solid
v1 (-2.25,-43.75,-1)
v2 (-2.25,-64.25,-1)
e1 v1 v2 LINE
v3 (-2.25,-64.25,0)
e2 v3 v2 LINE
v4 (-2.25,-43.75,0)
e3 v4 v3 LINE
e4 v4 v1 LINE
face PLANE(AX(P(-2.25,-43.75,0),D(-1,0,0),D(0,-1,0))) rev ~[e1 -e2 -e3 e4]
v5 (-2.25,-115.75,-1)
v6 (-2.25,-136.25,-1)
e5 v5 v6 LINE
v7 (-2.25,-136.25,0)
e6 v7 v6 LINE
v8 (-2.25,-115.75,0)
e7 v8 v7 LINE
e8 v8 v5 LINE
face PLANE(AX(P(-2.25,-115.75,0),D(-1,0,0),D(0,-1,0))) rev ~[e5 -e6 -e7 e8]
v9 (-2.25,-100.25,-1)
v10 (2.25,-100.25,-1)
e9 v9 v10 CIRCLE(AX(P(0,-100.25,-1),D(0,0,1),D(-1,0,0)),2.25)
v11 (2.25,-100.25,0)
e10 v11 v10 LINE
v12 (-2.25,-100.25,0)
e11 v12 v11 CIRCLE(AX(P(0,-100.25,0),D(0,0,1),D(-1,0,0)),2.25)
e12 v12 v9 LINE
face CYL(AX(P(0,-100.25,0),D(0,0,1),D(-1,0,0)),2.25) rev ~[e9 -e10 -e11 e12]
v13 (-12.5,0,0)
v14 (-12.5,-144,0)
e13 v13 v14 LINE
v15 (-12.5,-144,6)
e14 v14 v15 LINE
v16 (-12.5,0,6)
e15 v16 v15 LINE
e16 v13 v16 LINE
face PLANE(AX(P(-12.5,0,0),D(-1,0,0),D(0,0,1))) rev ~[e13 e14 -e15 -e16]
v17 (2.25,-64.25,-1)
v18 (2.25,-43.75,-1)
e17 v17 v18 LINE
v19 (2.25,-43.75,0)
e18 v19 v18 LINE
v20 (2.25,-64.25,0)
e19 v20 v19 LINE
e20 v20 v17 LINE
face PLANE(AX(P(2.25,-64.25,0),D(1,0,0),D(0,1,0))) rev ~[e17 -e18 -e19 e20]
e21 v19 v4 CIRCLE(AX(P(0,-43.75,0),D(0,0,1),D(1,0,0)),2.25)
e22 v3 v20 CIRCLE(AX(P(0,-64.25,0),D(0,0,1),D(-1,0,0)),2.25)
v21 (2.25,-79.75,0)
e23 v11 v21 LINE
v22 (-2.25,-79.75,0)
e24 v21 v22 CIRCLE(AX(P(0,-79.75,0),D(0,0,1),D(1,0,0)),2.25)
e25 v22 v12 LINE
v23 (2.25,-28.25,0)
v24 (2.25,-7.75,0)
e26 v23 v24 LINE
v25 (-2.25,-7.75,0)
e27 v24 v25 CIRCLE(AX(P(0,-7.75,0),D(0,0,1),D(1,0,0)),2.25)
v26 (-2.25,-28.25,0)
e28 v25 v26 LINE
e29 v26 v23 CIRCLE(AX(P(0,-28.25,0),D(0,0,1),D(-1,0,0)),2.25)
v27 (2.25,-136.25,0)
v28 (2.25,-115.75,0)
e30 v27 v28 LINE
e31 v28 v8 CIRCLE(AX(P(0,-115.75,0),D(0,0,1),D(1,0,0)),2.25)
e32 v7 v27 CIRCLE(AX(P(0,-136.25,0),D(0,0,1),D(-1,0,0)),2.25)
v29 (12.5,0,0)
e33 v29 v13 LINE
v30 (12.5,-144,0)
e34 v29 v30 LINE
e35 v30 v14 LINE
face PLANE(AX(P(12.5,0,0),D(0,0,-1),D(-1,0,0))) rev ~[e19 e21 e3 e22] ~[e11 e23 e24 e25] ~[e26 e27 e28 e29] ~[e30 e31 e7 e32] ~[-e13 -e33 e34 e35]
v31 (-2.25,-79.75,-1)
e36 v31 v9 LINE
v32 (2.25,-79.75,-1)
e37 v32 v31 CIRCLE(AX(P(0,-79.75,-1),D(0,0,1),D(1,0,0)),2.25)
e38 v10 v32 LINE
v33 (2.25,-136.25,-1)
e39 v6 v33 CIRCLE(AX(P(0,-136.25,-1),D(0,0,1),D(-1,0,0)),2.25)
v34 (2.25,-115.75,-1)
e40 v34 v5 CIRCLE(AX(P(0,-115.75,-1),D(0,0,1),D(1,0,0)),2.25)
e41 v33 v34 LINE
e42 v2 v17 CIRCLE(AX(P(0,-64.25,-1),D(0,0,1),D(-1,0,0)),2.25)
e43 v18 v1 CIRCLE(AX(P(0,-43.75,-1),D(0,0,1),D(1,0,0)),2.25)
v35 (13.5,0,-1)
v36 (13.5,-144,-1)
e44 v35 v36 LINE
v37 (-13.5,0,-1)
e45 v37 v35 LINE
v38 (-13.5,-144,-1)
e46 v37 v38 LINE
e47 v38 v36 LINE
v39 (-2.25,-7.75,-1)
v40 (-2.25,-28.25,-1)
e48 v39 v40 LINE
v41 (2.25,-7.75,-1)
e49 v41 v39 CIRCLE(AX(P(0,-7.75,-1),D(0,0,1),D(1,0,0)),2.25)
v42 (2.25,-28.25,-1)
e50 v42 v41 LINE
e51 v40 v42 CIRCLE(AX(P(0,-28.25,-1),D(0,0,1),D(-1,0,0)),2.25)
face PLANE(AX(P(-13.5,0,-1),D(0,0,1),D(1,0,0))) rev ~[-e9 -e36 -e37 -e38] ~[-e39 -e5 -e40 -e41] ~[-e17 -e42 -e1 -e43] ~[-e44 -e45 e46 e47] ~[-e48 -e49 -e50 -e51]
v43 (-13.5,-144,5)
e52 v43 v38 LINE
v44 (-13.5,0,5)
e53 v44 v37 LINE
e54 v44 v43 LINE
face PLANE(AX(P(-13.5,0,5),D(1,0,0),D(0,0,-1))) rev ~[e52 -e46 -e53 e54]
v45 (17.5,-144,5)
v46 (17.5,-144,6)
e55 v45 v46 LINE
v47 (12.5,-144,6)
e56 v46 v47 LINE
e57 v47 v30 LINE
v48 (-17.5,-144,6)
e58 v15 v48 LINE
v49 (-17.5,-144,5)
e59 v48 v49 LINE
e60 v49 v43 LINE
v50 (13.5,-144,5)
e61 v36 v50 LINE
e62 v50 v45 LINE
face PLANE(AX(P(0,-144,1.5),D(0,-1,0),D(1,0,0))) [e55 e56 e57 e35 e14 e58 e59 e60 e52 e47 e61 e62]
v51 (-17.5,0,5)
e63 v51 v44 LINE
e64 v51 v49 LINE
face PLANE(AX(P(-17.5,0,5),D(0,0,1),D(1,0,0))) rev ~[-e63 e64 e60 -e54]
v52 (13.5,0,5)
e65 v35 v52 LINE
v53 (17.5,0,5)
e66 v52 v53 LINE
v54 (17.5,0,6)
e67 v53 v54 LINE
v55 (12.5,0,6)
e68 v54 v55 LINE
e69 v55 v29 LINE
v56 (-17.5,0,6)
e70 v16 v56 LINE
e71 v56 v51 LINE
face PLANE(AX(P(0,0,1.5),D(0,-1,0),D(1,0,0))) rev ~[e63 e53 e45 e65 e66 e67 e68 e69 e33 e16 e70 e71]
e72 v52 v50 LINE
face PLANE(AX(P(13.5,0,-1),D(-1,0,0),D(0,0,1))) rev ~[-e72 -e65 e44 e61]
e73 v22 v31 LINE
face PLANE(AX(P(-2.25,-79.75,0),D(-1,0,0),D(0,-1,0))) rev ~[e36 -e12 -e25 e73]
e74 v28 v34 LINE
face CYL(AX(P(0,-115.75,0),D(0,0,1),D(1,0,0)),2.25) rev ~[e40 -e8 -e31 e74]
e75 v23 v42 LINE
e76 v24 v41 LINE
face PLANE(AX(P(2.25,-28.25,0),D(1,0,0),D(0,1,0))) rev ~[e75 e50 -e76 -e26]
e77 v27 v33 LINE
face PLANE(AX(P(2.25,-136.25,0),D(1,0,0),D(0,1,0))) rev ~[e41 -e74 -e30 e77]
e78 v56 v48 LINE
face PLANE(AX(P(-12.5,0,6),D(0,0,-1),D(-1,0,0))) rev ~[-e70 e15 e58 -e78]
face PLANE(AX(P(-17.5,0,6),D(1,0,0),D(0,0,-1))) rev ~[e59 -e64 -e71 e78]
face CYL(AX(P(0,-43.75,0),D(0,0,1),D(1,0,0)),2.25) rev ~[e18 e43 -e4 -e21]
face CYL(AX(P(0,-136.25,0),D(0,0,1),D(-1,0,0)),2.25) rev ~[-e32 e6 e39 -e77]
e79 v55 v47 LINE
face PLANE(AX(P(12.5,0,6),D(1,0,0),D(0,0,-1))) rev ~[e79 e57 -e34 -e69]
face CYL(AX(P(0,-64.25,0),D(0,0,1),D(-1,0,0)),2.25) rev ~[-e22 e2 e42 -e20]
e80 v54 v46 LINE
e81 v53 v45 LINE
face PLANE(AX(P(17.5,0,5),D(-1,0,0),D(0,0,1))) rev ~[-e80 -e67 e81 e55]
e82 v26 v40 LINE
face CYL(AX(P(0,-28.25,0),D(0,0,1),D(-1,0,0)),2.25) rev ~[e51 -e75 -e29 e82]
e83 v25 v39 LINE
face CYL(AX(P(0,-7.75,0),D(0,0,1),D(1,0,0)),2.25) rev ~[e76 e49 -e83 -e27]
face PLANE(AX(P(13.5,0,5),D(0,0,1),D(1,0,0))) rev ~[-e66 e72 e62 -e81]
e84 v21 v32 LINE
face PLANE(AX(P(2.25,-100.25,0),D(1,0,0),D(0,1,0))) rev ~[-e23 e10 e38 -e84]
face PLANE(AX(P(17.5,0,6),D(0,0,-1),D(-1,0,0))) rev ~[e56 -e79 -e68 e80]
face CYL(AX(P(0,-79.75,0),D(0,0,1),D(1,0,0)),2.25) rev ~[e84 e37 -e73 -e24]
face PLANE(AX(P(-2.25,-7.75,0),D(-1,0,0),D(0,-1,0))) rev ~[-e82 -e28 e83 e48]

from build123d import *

# Parameters (mm, degrees)
F1_DEPTH = 144
F3_DEPTH = 1.001


# Not quite as in the source:
# - a feature names something its author has since deleted; it is built from what else it names


with BuildPart() as f1:
    # F0 (on Front) → F1 (new body)
    with BuildSketch(Plane.XZ):
        Polygon((-17.5, 6), (-17.5, 5), (-13.5, 5), (-13.5, -1), (13.5, -1), (13.5, 5), (17.5, 5), (17.5, 6), (12.5, 6), (12.5, 0), (-12.5, 0), (-12.5, 6), align=None)
    extrude(amount=F1_DEPTH)

    # F2 (on face) → F3 (cut, through all)
    with BuildSketch(Plane.XY):
        with BuildLine():
            ThreePointArc((-2.25, -28.25), (0, -30.5), (2.25, -28.25))
            Line((2.25, -28.25), (2.25, -7.75))
            ThreePointArc((2.25, -7.75), (0, -5.5), (-2.25, -7.75))
            Line((-2.25, -7.75), (-2.25, -28.25))
        make_face()
        with BuildLine():
            Line((-2.25, -43.75), (-2.25, -64.25))
            ThreePointArc((-2.25, -64.25), (0, -66.5), (2.25, -64.25))
            Line((2.25, -64.25), (2.25, -43.75))
            ThreePointArc((2.25, -43.75), (0, -41.5), (-2.25, -43.75))
        make_face()
        with BuildLine():
            Line((-2.25, -79.75), (-2.25, -100.25))
            ThreePointArc((-2.25, -100.25), (0, -102.5), (2.25, -100.25))
            Line((2.25, -100.25), (2.25, -79.75))
            ThreePointArc((2.25, -79.75), (0, -77.5), (-2.25, -79.75))
        make_face()
        with BuildLine():
            Line((-2.25, -115.75), (-2.25, -136.25))
            ThreePointArc((-2.25, -136.25), (0, -138.5), (2.25, -136.25))
            Line((2.25, -136.25), (2.25, -115.75))
            ThreePointArc((2.25, -115.75), (0, -113.5), (-2.25, -115.75))
        make_face()
    extrude(amount=-F3_DEPTH, mode=Mode.SUBTRACT)


solid = f1.part
